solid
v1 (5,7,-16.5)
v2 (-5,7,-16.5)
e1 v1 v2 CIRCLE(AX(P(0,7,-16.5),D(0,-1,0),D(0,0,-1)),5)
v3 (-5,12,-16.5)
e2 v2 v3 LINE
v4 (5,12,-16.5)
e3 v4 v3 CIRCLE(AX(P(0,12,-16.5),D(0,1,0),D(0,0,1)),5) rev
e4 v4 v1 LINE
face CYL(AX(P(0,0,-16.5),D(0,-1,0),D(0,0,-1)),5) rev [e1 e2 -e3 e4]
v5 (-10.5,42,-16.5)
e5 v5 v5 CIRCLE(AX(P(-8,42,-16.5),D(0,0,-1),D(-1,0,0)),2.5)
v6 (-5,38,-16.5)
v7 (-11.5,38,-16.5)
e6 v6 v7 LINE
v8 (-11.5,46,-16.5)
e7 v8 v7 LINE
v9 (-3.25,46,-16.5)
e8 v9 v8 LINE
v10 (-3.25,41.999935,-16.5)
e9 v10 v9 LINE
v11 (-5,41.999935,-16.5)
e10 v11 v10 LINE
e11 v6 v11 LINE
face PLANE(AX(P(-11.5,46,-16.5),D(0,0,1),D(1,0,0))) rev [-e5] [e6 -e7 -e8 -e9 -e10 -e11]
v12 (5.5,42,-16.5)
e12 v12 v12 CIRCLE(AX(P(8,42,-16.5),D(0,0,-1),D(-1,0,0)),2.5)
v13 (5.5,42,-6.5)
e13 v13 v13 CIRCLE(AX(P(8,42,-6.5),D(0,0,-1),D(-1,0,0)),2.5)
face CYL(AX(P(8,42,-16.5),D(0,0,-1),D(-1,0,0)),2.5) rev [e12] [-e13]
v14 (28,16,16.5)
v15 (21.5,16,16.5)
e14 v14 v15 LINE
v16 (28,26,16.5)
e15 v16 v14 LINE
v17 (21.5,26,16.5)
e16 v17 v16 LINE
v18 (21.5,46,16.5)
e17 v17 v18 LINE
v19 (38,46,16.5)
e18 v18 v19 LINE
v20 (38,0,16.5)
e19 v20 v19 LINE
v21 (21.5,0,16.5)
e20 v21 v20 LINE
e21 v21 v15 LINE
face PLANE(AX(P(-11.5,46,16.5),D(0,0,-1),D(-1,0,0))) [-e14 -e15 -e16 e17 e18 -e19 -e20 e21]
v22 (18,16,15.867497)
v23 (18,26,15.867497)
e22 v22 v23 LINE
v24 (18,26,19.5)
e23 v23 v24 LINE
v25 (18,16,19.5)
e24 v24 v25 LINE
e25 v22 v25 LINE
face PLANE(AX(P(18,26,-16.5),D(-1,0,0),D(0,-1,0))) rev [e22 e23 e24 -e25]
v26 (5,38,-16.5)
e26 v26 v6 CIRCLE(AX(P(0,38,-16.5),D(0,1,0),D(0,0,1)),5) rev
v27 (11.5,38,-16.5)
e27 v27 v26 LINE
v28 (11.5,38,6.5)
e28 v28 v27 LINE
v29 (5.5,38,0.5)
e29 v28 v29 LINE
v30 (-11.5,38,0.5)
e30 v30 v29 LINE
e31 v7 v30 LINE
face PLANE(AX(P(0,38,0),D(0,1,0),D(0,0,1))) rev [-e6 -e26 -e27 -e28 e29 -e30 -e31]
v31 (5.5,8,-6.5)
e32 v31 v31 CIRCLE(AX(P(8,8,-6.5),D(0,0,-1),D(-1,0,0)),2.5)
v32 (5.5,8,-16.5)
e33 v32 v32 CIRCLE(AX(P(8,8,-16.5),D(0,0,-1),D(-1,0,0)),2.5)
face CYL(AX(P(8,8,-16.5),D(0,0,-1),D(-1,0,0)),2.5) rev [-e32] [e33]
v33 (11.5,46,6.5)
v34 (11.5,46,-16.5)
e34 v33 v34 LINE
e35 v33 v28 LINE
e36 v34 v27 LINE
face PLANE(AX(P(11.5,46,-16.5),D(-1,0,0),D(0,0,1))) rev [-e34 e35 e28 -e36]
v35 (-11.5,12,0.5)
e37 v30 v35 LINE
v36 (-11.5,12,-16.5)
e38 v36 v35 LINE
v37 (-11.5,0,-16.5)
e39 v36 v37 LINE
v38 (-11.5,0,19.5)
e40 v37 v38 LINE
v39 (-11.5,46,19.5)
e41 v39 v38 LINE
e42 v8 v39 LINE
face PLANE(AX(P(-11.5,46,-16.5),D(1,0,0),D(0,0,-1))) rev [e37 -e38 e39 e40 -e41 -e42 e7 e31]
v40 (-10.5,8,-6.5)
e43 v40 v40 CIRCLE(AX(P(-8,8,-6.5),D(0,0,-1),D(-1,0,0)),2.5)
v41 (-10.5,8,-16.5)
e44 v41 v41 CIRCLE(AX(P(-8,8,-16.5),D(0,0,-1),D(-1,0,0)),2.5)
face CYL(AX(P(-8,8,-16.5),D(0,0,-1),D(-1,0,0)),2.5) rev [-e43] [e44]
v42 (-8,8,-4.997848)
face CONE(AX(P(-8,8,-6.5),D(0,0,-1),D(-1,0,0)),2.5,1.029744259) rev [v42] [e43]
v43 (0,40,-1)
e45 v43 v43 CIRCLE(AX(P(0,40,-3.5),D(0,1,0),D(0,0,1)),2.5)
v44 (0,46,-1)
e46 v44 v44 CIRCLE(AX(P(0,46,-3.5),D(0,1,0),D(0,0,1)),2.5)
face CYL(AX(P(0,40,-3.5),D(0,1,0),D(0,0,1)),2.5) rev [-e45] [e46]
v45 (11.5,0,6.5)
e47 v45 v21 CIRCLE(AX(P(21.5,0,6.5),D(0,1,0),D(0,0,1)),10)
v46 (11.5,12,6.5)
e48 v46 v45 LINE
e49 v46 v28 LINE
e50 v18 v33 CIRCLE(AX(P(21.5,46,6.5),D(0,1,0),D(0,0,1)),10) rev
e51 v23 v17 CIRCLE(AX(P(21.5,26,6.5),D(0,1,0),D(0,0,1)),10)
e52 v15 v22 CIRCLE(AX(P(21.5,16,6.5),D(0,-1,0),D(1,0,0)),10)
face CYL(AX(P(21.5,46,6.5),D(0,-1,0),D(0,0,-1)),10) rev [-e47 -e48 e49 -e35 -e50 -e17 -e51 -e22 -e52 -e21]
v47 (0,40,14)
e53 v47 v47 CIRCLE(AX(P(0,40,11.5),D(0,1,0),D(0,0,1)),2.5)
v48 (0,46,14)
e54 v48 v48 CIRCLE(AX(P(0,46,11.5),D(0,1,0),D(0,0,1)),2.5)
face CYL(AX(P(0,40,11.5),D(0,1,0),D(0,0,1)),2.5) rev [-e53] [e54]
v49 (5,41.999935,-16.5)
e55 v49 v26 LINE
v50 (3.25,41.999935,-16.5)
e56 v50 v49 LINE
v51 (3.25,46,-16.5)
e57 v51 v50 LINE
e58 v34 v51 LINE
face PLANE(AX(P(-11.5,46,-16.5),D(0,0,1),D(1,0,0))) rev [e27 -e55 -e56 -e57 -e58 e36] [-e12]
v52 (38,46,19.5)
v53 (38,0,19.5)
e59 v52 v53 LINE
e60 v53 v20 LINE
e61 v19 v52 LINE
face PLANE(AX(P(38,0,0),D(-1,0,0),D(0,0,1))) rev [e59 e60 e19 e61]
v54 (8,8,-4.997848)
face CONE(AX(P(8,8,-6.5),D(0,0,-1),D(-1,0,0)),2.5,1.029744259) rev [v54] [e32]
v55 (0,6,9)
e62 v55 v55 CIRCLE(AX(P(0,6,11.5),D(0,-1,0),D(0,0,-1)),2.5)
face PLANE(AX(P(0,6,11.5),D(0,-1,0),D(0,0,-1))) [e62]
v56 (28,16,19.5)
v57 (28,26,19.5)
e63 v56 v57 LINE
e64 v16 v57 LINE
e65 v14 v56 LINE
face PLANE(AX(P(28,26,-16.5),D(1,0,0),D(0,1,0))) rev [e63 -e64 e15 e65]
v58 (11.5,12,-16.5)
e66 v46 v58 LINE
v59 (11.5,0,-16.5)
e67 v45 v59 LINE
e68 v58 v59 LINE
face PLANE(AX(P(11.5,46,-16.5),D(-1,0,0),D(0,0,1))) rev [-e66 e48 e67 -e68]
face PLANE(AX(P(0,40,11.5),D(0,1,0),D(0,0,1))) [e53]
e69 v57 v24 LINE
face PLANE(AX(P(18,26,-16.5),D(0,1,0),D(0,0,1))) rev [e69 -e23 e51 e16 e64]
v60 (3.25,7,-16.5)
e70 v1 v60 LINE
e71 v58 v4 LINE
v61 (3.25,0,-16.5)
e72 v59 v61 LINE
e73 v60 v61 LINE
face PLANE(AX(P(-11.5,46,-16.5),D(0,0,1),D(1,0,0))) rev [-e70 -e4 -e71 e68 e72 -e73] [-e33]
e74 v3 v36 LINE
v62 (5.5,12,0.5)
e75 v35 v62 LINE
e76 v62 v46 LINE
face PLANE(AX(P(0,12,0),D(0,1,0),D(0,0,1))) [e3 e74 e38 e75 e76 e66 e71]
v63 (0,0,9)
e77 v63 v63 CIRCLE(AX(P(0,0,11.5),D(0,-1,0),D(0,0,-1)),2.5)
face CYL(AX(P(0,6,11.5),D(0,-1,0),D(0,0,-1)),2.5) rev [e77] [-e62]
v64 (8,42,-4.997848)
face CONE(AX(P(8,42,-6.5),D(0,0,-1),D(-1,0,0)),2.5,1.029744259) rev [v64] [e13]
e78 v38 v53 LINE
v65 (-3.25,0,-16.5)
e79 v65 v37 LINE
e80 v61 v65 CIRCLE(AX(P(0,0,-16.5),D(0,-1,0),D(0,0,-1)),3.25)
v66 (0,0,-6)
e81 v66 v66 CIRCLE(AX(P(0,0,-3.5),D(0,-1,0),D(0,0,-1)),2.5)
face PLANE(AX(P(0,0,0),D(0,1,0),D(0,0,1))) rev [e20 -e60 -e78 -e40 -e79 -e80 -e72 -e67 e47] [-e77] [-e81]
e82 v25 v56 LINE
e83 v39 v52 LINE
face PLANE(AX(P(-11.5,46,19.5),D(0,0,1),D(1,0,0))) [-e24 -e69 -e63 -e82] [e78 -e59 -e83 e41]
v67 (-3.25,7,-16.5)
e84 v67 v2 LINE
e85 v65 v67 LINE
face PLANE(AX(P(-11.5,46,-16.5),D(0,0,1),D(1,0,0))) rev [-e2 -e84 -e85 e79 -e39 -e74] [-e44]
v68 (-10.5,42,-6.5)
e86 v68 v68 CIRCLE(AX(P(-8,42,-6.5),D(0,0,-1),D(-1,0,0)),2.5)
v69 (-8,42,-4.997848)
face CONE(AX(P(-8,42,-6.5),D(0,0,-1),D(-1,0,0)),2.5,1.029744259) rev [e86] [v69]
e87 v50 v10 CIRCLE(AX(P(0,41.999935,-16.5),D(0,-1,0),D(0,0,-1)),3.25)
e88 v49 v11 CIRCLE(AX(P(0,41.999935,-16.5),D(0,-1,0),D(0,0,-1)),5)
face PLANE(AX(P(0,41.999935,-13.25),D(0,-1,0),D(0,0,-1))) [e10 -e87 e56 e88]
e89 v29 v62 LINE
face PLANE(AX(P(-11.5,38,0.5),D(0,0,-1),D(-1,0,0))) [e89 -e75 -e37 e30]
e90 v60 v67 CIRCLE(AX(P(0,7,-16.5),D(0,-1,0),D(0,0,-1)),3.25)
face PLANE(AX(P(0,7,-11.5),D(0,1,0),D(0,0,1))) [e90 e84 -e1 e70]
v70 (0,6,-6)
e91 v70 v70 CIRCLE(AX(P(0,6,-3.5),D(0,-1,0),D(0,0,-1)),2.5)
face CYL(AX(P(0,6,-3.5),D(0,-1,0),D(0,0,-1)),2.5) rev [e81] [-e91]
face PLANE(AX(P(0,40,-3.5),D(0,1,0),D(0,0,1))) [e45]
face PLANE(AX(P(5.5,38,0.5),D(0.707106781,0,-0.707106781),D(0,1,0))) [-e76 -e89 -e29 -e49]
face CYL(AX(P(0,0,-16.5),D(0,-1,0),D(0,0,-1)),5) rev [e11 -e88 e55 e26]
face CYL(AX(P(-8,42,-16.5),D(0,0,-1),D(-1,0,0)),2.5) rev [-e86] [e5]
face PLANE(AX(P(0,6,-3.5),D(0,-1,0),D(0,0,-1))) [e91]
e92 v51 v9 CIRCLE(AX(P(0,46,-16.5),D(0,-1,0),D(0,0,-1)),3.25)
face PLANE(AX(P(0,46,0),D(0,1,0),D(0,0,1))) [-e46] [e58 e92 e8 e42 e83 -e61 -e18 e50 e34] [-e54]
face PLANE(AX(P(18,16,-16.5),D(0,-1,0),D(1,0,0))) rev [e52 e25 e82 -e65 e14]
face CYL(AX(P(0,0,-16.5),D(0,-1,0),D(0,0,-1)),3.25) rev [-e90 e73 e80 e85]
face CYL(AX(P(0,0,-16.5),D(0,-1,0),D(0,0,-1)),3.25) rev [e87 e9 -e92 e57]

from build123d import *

# Parameters (mm, degrees)
SKETCH1_W                 = 23
SKETCH1_H                 = 33
BOSS_EXTRUDE1_DEPTH       = 46
CUT_EXTRUDE1_START        = 12
SKETCH2_W                 = 23
SKETCH2_H                 = 17
CUT_EXTRUDE1_DEPTH        = 26
SKETCH3_R                 = 2.5
CUT_EXTRUDE2_DEPTH        = 6
CUT_EXTRUDE3_START        = -6
SKETCH4_R                 = 2.5
CUT_EXTRUDE3_DEPTH        = 6
CHAMFER1_SIZE             = 6
BOSS_EXTRUDE2_DEPTH       = 26.5
BOSS_EXTRUDE2_DEPTH_BACK  = 23
SKETCH6_W                 = 3
SKETCH6_H                 = 46
F_5_0MM_DOWEL_HOLE1_D     = 5
F_5_0MM_DOWEL_HOLE1_DEPTH = 10
F_5_0MM_DOWEL_HOLE1_TIP   = 1.502151548
SKETCH14_W                = 10
SKETCH14_H                = 10
CUT_EXTRUDE4_DEPTH        = 70.685005561
FILLET1_DEPTH             = 46
FILLET1_START             = 26
FILLET1_2_DEPTH           = 20
FILLET1_3_DEPTH           = 16


with BuildPart() as part:
    # Sketch1 → Boss-Extrude1 (new body)
    with BuildSketch(Plane(origin=(0, 0, 0), x_dir=(1, 0, 0), z_dir=(0, 1, 0))):
        Rectangle(SKETCH1_W, SKETCH1_H)
    extrude(amount=BOSS_EXTRUDE1_DEPTH)

    # Sketch2 → Cut-Extrude1 (cut)
    with BuildSketch(Plane(origin=(0, 0, 0), x_dir=(1, 0, 0), z_dir=(0, 1, 0)).offset(CUT_EXTRUDE1_START)):
        with Locations((0, 8)):
            Rectangle(SKETCH2_W, SKETCH2_H)
    extrude(amount=CUT_EXTRUDE1_DEPTH, mode=Mode.SUBTRACT)

    # Sketch3 → Cut-Extrude2 (cut)
    with BuildSketch(Plane(origin=(0, 46, 0), x_dir=(1, 0, 0), z_dir=(0, 1, 0))):
        with Locations(Location((0, -11.5, 0), (0, 0, 270))):
            Circle(SKETCH3_R)
        with Locations(Location((0, 3.5, 0), (0, 0, 270))):
            Circle(SKETCH3_R)
    extrude(amount=-CUT_EXTRUDE2_DEPTH, mode=Mode.SUBTRACT)

    # Sketch4 → Cut-Extrude3 (cut)
    with BuildSketch(Plane.XZ.offset(CUT_EXTRUDE3_START)):
        with Locations(Location((0, -3.5, 0), (0, 0, 90))):
            Circle(SKETCH4_R)
        with Locations(Location((0, 11.5, 0), (0, 0, 90))):
            Circle(SKETCH4_R)
    extrude(amount=CUT_EXTRUDE3_DEPTH, mode=Mode.SUBTRACT)

    # Chamfer1
    chamfer1_edges = [part.edges().sort_by_distance(p)[0] for p in [
        (11.5, 25, 0.5),
    ]]
    chamfer(chamfer1_edges, length=CHAMFER1_SIZE)

    # Sketch6 → Boss-Extrude2 (add, two sides: drawn at the far end of the back side and taken through both)
    with BuildSketch(Plane(origin=(11.5, 0, 0), x_dir=(0, 0, -1), z_dir=(1, 0, 0)).offset(-BOSS_EXTRUDE2_DEPTH_BACK)):
        with Locations((-18, 23)):
            Rectangle(SKETCH6_W, SKETCH6_H)
    extrude(amount=BOSS_EXTRUDE2_DEPTH + BOSS_EXTRUDE2_DEPTH_BACK)

    # Ø5.0mm Dowel Hole1
    with Locations(Plane(origin=(0, 0, -16.5), x_dir=(-1, 0, 0), z_dir=(0, 0, -1))):
        with Locations((-8, 42), (-8, 8), (8, 8), (8, 42)):
            Hole(F_5_0MM_DOWEL_HOLE1_D / 2, depth=F_5_0MM_DOWEL_HOLE1_DEPTH)
            with Locations((0, 0, -(F_5_0MM_DOWEL_HOLE1_DEPTH + F_5_0MM_DOWEL_HOLE1_TIP / 2))):  # 118° drill point
                Cone(0, F_5_0MM_DOWEL_HOLE1_D / 2, F_5_0MM_DOWEL_HOLE1_TIP, mode=Mode.SUBTRACT)

    # Sketch14 → Cut-Extrude4 (cut, through all)
    with BuildSketch(Plane.XY.offset(19.5)):
        with Locations((23, 21)):
            Rectangle(SKETCH14_W, SKETCH14_H)
    extrude(amount=-CUT_EXTRUDE4_DEPTH, mode=Mode.SUBTRACT)

    # Sketch15 → Cut-Revolve1 (revolve, cut)
    with BuildSketch(Plane(origin=(0, 0, 0), x_dir=(0, 0, -1), z_dir=(1, 0, 0))):
        Polygon((16.5, 46), (13.25, 46), (13.25, 41.999935081), (11.5, 41.999935081), (11.5, 7), (13.25, 7), (13.25, 0), (16.5, 0), align=None)
    revolve(axis=Axis((0, 0, -16.5), (0, 1, 0)), mode=Mode.SUBTRACT)

    # Fillet1: read off the stored shape, not the designer's step
    # Fillet1 outline → Fillet1 (add)
    with BuildSketch(Plane(origin=(0, 0, 0), x_dir=(1, 0, 0), z_dir=(0, 1, 0))):
        with BuildLine():
            Line((18, -16.5), (18, -15.867496998))
            ThreePointArc((18, -15.867496998), (13.284161637, -12.200877126), (11.5, -6.5))
            Line((11.5, -6.5), (11.5, -16.5))
            Line((11.5, -16.5), (18, -16.5))
        make_face()
    extrude(amount=FILLET1_DEPTH)

    # Fillet1 2 outline → Fillet1 2 (add)
    with BuildSketch(Plane(origin=(0, 0, 0), x_dir=(1, 0, 0), z_dir=(0, 1, 0)).offset(FILLET1_START)):
        with BuildLine():
            ThreePointArc((21.5, -16.5), (19.721653855, -16.340603894), (18, -15.867496998))
            Line((18, -15.867496998), (18, -16.5))
            Line((18, -16.5), (21.5, -16.5))
        make_face()
    extrude(amount=FILLET1_2_DEPTH)

    # Fillet1 3 outline → Fillet1 3 (add)
    with BuildSketch(Plane(origin=(0, 0, 0), x_dir=(1, 0, 0), z_dir=(0, 1, 0))):
        with BuildLine():
            ThreePointArc((21.5, -16.5), (19.721653855, -16.340603894), (18, -15.867496998))
            Line((18, -15.867496998), (18, -16.5))
            Line((18, -16.5), (21.5, -16.5))
        make_face()
    extrude(amount=FILLET1_3_DEPTH)


solid = part.part
